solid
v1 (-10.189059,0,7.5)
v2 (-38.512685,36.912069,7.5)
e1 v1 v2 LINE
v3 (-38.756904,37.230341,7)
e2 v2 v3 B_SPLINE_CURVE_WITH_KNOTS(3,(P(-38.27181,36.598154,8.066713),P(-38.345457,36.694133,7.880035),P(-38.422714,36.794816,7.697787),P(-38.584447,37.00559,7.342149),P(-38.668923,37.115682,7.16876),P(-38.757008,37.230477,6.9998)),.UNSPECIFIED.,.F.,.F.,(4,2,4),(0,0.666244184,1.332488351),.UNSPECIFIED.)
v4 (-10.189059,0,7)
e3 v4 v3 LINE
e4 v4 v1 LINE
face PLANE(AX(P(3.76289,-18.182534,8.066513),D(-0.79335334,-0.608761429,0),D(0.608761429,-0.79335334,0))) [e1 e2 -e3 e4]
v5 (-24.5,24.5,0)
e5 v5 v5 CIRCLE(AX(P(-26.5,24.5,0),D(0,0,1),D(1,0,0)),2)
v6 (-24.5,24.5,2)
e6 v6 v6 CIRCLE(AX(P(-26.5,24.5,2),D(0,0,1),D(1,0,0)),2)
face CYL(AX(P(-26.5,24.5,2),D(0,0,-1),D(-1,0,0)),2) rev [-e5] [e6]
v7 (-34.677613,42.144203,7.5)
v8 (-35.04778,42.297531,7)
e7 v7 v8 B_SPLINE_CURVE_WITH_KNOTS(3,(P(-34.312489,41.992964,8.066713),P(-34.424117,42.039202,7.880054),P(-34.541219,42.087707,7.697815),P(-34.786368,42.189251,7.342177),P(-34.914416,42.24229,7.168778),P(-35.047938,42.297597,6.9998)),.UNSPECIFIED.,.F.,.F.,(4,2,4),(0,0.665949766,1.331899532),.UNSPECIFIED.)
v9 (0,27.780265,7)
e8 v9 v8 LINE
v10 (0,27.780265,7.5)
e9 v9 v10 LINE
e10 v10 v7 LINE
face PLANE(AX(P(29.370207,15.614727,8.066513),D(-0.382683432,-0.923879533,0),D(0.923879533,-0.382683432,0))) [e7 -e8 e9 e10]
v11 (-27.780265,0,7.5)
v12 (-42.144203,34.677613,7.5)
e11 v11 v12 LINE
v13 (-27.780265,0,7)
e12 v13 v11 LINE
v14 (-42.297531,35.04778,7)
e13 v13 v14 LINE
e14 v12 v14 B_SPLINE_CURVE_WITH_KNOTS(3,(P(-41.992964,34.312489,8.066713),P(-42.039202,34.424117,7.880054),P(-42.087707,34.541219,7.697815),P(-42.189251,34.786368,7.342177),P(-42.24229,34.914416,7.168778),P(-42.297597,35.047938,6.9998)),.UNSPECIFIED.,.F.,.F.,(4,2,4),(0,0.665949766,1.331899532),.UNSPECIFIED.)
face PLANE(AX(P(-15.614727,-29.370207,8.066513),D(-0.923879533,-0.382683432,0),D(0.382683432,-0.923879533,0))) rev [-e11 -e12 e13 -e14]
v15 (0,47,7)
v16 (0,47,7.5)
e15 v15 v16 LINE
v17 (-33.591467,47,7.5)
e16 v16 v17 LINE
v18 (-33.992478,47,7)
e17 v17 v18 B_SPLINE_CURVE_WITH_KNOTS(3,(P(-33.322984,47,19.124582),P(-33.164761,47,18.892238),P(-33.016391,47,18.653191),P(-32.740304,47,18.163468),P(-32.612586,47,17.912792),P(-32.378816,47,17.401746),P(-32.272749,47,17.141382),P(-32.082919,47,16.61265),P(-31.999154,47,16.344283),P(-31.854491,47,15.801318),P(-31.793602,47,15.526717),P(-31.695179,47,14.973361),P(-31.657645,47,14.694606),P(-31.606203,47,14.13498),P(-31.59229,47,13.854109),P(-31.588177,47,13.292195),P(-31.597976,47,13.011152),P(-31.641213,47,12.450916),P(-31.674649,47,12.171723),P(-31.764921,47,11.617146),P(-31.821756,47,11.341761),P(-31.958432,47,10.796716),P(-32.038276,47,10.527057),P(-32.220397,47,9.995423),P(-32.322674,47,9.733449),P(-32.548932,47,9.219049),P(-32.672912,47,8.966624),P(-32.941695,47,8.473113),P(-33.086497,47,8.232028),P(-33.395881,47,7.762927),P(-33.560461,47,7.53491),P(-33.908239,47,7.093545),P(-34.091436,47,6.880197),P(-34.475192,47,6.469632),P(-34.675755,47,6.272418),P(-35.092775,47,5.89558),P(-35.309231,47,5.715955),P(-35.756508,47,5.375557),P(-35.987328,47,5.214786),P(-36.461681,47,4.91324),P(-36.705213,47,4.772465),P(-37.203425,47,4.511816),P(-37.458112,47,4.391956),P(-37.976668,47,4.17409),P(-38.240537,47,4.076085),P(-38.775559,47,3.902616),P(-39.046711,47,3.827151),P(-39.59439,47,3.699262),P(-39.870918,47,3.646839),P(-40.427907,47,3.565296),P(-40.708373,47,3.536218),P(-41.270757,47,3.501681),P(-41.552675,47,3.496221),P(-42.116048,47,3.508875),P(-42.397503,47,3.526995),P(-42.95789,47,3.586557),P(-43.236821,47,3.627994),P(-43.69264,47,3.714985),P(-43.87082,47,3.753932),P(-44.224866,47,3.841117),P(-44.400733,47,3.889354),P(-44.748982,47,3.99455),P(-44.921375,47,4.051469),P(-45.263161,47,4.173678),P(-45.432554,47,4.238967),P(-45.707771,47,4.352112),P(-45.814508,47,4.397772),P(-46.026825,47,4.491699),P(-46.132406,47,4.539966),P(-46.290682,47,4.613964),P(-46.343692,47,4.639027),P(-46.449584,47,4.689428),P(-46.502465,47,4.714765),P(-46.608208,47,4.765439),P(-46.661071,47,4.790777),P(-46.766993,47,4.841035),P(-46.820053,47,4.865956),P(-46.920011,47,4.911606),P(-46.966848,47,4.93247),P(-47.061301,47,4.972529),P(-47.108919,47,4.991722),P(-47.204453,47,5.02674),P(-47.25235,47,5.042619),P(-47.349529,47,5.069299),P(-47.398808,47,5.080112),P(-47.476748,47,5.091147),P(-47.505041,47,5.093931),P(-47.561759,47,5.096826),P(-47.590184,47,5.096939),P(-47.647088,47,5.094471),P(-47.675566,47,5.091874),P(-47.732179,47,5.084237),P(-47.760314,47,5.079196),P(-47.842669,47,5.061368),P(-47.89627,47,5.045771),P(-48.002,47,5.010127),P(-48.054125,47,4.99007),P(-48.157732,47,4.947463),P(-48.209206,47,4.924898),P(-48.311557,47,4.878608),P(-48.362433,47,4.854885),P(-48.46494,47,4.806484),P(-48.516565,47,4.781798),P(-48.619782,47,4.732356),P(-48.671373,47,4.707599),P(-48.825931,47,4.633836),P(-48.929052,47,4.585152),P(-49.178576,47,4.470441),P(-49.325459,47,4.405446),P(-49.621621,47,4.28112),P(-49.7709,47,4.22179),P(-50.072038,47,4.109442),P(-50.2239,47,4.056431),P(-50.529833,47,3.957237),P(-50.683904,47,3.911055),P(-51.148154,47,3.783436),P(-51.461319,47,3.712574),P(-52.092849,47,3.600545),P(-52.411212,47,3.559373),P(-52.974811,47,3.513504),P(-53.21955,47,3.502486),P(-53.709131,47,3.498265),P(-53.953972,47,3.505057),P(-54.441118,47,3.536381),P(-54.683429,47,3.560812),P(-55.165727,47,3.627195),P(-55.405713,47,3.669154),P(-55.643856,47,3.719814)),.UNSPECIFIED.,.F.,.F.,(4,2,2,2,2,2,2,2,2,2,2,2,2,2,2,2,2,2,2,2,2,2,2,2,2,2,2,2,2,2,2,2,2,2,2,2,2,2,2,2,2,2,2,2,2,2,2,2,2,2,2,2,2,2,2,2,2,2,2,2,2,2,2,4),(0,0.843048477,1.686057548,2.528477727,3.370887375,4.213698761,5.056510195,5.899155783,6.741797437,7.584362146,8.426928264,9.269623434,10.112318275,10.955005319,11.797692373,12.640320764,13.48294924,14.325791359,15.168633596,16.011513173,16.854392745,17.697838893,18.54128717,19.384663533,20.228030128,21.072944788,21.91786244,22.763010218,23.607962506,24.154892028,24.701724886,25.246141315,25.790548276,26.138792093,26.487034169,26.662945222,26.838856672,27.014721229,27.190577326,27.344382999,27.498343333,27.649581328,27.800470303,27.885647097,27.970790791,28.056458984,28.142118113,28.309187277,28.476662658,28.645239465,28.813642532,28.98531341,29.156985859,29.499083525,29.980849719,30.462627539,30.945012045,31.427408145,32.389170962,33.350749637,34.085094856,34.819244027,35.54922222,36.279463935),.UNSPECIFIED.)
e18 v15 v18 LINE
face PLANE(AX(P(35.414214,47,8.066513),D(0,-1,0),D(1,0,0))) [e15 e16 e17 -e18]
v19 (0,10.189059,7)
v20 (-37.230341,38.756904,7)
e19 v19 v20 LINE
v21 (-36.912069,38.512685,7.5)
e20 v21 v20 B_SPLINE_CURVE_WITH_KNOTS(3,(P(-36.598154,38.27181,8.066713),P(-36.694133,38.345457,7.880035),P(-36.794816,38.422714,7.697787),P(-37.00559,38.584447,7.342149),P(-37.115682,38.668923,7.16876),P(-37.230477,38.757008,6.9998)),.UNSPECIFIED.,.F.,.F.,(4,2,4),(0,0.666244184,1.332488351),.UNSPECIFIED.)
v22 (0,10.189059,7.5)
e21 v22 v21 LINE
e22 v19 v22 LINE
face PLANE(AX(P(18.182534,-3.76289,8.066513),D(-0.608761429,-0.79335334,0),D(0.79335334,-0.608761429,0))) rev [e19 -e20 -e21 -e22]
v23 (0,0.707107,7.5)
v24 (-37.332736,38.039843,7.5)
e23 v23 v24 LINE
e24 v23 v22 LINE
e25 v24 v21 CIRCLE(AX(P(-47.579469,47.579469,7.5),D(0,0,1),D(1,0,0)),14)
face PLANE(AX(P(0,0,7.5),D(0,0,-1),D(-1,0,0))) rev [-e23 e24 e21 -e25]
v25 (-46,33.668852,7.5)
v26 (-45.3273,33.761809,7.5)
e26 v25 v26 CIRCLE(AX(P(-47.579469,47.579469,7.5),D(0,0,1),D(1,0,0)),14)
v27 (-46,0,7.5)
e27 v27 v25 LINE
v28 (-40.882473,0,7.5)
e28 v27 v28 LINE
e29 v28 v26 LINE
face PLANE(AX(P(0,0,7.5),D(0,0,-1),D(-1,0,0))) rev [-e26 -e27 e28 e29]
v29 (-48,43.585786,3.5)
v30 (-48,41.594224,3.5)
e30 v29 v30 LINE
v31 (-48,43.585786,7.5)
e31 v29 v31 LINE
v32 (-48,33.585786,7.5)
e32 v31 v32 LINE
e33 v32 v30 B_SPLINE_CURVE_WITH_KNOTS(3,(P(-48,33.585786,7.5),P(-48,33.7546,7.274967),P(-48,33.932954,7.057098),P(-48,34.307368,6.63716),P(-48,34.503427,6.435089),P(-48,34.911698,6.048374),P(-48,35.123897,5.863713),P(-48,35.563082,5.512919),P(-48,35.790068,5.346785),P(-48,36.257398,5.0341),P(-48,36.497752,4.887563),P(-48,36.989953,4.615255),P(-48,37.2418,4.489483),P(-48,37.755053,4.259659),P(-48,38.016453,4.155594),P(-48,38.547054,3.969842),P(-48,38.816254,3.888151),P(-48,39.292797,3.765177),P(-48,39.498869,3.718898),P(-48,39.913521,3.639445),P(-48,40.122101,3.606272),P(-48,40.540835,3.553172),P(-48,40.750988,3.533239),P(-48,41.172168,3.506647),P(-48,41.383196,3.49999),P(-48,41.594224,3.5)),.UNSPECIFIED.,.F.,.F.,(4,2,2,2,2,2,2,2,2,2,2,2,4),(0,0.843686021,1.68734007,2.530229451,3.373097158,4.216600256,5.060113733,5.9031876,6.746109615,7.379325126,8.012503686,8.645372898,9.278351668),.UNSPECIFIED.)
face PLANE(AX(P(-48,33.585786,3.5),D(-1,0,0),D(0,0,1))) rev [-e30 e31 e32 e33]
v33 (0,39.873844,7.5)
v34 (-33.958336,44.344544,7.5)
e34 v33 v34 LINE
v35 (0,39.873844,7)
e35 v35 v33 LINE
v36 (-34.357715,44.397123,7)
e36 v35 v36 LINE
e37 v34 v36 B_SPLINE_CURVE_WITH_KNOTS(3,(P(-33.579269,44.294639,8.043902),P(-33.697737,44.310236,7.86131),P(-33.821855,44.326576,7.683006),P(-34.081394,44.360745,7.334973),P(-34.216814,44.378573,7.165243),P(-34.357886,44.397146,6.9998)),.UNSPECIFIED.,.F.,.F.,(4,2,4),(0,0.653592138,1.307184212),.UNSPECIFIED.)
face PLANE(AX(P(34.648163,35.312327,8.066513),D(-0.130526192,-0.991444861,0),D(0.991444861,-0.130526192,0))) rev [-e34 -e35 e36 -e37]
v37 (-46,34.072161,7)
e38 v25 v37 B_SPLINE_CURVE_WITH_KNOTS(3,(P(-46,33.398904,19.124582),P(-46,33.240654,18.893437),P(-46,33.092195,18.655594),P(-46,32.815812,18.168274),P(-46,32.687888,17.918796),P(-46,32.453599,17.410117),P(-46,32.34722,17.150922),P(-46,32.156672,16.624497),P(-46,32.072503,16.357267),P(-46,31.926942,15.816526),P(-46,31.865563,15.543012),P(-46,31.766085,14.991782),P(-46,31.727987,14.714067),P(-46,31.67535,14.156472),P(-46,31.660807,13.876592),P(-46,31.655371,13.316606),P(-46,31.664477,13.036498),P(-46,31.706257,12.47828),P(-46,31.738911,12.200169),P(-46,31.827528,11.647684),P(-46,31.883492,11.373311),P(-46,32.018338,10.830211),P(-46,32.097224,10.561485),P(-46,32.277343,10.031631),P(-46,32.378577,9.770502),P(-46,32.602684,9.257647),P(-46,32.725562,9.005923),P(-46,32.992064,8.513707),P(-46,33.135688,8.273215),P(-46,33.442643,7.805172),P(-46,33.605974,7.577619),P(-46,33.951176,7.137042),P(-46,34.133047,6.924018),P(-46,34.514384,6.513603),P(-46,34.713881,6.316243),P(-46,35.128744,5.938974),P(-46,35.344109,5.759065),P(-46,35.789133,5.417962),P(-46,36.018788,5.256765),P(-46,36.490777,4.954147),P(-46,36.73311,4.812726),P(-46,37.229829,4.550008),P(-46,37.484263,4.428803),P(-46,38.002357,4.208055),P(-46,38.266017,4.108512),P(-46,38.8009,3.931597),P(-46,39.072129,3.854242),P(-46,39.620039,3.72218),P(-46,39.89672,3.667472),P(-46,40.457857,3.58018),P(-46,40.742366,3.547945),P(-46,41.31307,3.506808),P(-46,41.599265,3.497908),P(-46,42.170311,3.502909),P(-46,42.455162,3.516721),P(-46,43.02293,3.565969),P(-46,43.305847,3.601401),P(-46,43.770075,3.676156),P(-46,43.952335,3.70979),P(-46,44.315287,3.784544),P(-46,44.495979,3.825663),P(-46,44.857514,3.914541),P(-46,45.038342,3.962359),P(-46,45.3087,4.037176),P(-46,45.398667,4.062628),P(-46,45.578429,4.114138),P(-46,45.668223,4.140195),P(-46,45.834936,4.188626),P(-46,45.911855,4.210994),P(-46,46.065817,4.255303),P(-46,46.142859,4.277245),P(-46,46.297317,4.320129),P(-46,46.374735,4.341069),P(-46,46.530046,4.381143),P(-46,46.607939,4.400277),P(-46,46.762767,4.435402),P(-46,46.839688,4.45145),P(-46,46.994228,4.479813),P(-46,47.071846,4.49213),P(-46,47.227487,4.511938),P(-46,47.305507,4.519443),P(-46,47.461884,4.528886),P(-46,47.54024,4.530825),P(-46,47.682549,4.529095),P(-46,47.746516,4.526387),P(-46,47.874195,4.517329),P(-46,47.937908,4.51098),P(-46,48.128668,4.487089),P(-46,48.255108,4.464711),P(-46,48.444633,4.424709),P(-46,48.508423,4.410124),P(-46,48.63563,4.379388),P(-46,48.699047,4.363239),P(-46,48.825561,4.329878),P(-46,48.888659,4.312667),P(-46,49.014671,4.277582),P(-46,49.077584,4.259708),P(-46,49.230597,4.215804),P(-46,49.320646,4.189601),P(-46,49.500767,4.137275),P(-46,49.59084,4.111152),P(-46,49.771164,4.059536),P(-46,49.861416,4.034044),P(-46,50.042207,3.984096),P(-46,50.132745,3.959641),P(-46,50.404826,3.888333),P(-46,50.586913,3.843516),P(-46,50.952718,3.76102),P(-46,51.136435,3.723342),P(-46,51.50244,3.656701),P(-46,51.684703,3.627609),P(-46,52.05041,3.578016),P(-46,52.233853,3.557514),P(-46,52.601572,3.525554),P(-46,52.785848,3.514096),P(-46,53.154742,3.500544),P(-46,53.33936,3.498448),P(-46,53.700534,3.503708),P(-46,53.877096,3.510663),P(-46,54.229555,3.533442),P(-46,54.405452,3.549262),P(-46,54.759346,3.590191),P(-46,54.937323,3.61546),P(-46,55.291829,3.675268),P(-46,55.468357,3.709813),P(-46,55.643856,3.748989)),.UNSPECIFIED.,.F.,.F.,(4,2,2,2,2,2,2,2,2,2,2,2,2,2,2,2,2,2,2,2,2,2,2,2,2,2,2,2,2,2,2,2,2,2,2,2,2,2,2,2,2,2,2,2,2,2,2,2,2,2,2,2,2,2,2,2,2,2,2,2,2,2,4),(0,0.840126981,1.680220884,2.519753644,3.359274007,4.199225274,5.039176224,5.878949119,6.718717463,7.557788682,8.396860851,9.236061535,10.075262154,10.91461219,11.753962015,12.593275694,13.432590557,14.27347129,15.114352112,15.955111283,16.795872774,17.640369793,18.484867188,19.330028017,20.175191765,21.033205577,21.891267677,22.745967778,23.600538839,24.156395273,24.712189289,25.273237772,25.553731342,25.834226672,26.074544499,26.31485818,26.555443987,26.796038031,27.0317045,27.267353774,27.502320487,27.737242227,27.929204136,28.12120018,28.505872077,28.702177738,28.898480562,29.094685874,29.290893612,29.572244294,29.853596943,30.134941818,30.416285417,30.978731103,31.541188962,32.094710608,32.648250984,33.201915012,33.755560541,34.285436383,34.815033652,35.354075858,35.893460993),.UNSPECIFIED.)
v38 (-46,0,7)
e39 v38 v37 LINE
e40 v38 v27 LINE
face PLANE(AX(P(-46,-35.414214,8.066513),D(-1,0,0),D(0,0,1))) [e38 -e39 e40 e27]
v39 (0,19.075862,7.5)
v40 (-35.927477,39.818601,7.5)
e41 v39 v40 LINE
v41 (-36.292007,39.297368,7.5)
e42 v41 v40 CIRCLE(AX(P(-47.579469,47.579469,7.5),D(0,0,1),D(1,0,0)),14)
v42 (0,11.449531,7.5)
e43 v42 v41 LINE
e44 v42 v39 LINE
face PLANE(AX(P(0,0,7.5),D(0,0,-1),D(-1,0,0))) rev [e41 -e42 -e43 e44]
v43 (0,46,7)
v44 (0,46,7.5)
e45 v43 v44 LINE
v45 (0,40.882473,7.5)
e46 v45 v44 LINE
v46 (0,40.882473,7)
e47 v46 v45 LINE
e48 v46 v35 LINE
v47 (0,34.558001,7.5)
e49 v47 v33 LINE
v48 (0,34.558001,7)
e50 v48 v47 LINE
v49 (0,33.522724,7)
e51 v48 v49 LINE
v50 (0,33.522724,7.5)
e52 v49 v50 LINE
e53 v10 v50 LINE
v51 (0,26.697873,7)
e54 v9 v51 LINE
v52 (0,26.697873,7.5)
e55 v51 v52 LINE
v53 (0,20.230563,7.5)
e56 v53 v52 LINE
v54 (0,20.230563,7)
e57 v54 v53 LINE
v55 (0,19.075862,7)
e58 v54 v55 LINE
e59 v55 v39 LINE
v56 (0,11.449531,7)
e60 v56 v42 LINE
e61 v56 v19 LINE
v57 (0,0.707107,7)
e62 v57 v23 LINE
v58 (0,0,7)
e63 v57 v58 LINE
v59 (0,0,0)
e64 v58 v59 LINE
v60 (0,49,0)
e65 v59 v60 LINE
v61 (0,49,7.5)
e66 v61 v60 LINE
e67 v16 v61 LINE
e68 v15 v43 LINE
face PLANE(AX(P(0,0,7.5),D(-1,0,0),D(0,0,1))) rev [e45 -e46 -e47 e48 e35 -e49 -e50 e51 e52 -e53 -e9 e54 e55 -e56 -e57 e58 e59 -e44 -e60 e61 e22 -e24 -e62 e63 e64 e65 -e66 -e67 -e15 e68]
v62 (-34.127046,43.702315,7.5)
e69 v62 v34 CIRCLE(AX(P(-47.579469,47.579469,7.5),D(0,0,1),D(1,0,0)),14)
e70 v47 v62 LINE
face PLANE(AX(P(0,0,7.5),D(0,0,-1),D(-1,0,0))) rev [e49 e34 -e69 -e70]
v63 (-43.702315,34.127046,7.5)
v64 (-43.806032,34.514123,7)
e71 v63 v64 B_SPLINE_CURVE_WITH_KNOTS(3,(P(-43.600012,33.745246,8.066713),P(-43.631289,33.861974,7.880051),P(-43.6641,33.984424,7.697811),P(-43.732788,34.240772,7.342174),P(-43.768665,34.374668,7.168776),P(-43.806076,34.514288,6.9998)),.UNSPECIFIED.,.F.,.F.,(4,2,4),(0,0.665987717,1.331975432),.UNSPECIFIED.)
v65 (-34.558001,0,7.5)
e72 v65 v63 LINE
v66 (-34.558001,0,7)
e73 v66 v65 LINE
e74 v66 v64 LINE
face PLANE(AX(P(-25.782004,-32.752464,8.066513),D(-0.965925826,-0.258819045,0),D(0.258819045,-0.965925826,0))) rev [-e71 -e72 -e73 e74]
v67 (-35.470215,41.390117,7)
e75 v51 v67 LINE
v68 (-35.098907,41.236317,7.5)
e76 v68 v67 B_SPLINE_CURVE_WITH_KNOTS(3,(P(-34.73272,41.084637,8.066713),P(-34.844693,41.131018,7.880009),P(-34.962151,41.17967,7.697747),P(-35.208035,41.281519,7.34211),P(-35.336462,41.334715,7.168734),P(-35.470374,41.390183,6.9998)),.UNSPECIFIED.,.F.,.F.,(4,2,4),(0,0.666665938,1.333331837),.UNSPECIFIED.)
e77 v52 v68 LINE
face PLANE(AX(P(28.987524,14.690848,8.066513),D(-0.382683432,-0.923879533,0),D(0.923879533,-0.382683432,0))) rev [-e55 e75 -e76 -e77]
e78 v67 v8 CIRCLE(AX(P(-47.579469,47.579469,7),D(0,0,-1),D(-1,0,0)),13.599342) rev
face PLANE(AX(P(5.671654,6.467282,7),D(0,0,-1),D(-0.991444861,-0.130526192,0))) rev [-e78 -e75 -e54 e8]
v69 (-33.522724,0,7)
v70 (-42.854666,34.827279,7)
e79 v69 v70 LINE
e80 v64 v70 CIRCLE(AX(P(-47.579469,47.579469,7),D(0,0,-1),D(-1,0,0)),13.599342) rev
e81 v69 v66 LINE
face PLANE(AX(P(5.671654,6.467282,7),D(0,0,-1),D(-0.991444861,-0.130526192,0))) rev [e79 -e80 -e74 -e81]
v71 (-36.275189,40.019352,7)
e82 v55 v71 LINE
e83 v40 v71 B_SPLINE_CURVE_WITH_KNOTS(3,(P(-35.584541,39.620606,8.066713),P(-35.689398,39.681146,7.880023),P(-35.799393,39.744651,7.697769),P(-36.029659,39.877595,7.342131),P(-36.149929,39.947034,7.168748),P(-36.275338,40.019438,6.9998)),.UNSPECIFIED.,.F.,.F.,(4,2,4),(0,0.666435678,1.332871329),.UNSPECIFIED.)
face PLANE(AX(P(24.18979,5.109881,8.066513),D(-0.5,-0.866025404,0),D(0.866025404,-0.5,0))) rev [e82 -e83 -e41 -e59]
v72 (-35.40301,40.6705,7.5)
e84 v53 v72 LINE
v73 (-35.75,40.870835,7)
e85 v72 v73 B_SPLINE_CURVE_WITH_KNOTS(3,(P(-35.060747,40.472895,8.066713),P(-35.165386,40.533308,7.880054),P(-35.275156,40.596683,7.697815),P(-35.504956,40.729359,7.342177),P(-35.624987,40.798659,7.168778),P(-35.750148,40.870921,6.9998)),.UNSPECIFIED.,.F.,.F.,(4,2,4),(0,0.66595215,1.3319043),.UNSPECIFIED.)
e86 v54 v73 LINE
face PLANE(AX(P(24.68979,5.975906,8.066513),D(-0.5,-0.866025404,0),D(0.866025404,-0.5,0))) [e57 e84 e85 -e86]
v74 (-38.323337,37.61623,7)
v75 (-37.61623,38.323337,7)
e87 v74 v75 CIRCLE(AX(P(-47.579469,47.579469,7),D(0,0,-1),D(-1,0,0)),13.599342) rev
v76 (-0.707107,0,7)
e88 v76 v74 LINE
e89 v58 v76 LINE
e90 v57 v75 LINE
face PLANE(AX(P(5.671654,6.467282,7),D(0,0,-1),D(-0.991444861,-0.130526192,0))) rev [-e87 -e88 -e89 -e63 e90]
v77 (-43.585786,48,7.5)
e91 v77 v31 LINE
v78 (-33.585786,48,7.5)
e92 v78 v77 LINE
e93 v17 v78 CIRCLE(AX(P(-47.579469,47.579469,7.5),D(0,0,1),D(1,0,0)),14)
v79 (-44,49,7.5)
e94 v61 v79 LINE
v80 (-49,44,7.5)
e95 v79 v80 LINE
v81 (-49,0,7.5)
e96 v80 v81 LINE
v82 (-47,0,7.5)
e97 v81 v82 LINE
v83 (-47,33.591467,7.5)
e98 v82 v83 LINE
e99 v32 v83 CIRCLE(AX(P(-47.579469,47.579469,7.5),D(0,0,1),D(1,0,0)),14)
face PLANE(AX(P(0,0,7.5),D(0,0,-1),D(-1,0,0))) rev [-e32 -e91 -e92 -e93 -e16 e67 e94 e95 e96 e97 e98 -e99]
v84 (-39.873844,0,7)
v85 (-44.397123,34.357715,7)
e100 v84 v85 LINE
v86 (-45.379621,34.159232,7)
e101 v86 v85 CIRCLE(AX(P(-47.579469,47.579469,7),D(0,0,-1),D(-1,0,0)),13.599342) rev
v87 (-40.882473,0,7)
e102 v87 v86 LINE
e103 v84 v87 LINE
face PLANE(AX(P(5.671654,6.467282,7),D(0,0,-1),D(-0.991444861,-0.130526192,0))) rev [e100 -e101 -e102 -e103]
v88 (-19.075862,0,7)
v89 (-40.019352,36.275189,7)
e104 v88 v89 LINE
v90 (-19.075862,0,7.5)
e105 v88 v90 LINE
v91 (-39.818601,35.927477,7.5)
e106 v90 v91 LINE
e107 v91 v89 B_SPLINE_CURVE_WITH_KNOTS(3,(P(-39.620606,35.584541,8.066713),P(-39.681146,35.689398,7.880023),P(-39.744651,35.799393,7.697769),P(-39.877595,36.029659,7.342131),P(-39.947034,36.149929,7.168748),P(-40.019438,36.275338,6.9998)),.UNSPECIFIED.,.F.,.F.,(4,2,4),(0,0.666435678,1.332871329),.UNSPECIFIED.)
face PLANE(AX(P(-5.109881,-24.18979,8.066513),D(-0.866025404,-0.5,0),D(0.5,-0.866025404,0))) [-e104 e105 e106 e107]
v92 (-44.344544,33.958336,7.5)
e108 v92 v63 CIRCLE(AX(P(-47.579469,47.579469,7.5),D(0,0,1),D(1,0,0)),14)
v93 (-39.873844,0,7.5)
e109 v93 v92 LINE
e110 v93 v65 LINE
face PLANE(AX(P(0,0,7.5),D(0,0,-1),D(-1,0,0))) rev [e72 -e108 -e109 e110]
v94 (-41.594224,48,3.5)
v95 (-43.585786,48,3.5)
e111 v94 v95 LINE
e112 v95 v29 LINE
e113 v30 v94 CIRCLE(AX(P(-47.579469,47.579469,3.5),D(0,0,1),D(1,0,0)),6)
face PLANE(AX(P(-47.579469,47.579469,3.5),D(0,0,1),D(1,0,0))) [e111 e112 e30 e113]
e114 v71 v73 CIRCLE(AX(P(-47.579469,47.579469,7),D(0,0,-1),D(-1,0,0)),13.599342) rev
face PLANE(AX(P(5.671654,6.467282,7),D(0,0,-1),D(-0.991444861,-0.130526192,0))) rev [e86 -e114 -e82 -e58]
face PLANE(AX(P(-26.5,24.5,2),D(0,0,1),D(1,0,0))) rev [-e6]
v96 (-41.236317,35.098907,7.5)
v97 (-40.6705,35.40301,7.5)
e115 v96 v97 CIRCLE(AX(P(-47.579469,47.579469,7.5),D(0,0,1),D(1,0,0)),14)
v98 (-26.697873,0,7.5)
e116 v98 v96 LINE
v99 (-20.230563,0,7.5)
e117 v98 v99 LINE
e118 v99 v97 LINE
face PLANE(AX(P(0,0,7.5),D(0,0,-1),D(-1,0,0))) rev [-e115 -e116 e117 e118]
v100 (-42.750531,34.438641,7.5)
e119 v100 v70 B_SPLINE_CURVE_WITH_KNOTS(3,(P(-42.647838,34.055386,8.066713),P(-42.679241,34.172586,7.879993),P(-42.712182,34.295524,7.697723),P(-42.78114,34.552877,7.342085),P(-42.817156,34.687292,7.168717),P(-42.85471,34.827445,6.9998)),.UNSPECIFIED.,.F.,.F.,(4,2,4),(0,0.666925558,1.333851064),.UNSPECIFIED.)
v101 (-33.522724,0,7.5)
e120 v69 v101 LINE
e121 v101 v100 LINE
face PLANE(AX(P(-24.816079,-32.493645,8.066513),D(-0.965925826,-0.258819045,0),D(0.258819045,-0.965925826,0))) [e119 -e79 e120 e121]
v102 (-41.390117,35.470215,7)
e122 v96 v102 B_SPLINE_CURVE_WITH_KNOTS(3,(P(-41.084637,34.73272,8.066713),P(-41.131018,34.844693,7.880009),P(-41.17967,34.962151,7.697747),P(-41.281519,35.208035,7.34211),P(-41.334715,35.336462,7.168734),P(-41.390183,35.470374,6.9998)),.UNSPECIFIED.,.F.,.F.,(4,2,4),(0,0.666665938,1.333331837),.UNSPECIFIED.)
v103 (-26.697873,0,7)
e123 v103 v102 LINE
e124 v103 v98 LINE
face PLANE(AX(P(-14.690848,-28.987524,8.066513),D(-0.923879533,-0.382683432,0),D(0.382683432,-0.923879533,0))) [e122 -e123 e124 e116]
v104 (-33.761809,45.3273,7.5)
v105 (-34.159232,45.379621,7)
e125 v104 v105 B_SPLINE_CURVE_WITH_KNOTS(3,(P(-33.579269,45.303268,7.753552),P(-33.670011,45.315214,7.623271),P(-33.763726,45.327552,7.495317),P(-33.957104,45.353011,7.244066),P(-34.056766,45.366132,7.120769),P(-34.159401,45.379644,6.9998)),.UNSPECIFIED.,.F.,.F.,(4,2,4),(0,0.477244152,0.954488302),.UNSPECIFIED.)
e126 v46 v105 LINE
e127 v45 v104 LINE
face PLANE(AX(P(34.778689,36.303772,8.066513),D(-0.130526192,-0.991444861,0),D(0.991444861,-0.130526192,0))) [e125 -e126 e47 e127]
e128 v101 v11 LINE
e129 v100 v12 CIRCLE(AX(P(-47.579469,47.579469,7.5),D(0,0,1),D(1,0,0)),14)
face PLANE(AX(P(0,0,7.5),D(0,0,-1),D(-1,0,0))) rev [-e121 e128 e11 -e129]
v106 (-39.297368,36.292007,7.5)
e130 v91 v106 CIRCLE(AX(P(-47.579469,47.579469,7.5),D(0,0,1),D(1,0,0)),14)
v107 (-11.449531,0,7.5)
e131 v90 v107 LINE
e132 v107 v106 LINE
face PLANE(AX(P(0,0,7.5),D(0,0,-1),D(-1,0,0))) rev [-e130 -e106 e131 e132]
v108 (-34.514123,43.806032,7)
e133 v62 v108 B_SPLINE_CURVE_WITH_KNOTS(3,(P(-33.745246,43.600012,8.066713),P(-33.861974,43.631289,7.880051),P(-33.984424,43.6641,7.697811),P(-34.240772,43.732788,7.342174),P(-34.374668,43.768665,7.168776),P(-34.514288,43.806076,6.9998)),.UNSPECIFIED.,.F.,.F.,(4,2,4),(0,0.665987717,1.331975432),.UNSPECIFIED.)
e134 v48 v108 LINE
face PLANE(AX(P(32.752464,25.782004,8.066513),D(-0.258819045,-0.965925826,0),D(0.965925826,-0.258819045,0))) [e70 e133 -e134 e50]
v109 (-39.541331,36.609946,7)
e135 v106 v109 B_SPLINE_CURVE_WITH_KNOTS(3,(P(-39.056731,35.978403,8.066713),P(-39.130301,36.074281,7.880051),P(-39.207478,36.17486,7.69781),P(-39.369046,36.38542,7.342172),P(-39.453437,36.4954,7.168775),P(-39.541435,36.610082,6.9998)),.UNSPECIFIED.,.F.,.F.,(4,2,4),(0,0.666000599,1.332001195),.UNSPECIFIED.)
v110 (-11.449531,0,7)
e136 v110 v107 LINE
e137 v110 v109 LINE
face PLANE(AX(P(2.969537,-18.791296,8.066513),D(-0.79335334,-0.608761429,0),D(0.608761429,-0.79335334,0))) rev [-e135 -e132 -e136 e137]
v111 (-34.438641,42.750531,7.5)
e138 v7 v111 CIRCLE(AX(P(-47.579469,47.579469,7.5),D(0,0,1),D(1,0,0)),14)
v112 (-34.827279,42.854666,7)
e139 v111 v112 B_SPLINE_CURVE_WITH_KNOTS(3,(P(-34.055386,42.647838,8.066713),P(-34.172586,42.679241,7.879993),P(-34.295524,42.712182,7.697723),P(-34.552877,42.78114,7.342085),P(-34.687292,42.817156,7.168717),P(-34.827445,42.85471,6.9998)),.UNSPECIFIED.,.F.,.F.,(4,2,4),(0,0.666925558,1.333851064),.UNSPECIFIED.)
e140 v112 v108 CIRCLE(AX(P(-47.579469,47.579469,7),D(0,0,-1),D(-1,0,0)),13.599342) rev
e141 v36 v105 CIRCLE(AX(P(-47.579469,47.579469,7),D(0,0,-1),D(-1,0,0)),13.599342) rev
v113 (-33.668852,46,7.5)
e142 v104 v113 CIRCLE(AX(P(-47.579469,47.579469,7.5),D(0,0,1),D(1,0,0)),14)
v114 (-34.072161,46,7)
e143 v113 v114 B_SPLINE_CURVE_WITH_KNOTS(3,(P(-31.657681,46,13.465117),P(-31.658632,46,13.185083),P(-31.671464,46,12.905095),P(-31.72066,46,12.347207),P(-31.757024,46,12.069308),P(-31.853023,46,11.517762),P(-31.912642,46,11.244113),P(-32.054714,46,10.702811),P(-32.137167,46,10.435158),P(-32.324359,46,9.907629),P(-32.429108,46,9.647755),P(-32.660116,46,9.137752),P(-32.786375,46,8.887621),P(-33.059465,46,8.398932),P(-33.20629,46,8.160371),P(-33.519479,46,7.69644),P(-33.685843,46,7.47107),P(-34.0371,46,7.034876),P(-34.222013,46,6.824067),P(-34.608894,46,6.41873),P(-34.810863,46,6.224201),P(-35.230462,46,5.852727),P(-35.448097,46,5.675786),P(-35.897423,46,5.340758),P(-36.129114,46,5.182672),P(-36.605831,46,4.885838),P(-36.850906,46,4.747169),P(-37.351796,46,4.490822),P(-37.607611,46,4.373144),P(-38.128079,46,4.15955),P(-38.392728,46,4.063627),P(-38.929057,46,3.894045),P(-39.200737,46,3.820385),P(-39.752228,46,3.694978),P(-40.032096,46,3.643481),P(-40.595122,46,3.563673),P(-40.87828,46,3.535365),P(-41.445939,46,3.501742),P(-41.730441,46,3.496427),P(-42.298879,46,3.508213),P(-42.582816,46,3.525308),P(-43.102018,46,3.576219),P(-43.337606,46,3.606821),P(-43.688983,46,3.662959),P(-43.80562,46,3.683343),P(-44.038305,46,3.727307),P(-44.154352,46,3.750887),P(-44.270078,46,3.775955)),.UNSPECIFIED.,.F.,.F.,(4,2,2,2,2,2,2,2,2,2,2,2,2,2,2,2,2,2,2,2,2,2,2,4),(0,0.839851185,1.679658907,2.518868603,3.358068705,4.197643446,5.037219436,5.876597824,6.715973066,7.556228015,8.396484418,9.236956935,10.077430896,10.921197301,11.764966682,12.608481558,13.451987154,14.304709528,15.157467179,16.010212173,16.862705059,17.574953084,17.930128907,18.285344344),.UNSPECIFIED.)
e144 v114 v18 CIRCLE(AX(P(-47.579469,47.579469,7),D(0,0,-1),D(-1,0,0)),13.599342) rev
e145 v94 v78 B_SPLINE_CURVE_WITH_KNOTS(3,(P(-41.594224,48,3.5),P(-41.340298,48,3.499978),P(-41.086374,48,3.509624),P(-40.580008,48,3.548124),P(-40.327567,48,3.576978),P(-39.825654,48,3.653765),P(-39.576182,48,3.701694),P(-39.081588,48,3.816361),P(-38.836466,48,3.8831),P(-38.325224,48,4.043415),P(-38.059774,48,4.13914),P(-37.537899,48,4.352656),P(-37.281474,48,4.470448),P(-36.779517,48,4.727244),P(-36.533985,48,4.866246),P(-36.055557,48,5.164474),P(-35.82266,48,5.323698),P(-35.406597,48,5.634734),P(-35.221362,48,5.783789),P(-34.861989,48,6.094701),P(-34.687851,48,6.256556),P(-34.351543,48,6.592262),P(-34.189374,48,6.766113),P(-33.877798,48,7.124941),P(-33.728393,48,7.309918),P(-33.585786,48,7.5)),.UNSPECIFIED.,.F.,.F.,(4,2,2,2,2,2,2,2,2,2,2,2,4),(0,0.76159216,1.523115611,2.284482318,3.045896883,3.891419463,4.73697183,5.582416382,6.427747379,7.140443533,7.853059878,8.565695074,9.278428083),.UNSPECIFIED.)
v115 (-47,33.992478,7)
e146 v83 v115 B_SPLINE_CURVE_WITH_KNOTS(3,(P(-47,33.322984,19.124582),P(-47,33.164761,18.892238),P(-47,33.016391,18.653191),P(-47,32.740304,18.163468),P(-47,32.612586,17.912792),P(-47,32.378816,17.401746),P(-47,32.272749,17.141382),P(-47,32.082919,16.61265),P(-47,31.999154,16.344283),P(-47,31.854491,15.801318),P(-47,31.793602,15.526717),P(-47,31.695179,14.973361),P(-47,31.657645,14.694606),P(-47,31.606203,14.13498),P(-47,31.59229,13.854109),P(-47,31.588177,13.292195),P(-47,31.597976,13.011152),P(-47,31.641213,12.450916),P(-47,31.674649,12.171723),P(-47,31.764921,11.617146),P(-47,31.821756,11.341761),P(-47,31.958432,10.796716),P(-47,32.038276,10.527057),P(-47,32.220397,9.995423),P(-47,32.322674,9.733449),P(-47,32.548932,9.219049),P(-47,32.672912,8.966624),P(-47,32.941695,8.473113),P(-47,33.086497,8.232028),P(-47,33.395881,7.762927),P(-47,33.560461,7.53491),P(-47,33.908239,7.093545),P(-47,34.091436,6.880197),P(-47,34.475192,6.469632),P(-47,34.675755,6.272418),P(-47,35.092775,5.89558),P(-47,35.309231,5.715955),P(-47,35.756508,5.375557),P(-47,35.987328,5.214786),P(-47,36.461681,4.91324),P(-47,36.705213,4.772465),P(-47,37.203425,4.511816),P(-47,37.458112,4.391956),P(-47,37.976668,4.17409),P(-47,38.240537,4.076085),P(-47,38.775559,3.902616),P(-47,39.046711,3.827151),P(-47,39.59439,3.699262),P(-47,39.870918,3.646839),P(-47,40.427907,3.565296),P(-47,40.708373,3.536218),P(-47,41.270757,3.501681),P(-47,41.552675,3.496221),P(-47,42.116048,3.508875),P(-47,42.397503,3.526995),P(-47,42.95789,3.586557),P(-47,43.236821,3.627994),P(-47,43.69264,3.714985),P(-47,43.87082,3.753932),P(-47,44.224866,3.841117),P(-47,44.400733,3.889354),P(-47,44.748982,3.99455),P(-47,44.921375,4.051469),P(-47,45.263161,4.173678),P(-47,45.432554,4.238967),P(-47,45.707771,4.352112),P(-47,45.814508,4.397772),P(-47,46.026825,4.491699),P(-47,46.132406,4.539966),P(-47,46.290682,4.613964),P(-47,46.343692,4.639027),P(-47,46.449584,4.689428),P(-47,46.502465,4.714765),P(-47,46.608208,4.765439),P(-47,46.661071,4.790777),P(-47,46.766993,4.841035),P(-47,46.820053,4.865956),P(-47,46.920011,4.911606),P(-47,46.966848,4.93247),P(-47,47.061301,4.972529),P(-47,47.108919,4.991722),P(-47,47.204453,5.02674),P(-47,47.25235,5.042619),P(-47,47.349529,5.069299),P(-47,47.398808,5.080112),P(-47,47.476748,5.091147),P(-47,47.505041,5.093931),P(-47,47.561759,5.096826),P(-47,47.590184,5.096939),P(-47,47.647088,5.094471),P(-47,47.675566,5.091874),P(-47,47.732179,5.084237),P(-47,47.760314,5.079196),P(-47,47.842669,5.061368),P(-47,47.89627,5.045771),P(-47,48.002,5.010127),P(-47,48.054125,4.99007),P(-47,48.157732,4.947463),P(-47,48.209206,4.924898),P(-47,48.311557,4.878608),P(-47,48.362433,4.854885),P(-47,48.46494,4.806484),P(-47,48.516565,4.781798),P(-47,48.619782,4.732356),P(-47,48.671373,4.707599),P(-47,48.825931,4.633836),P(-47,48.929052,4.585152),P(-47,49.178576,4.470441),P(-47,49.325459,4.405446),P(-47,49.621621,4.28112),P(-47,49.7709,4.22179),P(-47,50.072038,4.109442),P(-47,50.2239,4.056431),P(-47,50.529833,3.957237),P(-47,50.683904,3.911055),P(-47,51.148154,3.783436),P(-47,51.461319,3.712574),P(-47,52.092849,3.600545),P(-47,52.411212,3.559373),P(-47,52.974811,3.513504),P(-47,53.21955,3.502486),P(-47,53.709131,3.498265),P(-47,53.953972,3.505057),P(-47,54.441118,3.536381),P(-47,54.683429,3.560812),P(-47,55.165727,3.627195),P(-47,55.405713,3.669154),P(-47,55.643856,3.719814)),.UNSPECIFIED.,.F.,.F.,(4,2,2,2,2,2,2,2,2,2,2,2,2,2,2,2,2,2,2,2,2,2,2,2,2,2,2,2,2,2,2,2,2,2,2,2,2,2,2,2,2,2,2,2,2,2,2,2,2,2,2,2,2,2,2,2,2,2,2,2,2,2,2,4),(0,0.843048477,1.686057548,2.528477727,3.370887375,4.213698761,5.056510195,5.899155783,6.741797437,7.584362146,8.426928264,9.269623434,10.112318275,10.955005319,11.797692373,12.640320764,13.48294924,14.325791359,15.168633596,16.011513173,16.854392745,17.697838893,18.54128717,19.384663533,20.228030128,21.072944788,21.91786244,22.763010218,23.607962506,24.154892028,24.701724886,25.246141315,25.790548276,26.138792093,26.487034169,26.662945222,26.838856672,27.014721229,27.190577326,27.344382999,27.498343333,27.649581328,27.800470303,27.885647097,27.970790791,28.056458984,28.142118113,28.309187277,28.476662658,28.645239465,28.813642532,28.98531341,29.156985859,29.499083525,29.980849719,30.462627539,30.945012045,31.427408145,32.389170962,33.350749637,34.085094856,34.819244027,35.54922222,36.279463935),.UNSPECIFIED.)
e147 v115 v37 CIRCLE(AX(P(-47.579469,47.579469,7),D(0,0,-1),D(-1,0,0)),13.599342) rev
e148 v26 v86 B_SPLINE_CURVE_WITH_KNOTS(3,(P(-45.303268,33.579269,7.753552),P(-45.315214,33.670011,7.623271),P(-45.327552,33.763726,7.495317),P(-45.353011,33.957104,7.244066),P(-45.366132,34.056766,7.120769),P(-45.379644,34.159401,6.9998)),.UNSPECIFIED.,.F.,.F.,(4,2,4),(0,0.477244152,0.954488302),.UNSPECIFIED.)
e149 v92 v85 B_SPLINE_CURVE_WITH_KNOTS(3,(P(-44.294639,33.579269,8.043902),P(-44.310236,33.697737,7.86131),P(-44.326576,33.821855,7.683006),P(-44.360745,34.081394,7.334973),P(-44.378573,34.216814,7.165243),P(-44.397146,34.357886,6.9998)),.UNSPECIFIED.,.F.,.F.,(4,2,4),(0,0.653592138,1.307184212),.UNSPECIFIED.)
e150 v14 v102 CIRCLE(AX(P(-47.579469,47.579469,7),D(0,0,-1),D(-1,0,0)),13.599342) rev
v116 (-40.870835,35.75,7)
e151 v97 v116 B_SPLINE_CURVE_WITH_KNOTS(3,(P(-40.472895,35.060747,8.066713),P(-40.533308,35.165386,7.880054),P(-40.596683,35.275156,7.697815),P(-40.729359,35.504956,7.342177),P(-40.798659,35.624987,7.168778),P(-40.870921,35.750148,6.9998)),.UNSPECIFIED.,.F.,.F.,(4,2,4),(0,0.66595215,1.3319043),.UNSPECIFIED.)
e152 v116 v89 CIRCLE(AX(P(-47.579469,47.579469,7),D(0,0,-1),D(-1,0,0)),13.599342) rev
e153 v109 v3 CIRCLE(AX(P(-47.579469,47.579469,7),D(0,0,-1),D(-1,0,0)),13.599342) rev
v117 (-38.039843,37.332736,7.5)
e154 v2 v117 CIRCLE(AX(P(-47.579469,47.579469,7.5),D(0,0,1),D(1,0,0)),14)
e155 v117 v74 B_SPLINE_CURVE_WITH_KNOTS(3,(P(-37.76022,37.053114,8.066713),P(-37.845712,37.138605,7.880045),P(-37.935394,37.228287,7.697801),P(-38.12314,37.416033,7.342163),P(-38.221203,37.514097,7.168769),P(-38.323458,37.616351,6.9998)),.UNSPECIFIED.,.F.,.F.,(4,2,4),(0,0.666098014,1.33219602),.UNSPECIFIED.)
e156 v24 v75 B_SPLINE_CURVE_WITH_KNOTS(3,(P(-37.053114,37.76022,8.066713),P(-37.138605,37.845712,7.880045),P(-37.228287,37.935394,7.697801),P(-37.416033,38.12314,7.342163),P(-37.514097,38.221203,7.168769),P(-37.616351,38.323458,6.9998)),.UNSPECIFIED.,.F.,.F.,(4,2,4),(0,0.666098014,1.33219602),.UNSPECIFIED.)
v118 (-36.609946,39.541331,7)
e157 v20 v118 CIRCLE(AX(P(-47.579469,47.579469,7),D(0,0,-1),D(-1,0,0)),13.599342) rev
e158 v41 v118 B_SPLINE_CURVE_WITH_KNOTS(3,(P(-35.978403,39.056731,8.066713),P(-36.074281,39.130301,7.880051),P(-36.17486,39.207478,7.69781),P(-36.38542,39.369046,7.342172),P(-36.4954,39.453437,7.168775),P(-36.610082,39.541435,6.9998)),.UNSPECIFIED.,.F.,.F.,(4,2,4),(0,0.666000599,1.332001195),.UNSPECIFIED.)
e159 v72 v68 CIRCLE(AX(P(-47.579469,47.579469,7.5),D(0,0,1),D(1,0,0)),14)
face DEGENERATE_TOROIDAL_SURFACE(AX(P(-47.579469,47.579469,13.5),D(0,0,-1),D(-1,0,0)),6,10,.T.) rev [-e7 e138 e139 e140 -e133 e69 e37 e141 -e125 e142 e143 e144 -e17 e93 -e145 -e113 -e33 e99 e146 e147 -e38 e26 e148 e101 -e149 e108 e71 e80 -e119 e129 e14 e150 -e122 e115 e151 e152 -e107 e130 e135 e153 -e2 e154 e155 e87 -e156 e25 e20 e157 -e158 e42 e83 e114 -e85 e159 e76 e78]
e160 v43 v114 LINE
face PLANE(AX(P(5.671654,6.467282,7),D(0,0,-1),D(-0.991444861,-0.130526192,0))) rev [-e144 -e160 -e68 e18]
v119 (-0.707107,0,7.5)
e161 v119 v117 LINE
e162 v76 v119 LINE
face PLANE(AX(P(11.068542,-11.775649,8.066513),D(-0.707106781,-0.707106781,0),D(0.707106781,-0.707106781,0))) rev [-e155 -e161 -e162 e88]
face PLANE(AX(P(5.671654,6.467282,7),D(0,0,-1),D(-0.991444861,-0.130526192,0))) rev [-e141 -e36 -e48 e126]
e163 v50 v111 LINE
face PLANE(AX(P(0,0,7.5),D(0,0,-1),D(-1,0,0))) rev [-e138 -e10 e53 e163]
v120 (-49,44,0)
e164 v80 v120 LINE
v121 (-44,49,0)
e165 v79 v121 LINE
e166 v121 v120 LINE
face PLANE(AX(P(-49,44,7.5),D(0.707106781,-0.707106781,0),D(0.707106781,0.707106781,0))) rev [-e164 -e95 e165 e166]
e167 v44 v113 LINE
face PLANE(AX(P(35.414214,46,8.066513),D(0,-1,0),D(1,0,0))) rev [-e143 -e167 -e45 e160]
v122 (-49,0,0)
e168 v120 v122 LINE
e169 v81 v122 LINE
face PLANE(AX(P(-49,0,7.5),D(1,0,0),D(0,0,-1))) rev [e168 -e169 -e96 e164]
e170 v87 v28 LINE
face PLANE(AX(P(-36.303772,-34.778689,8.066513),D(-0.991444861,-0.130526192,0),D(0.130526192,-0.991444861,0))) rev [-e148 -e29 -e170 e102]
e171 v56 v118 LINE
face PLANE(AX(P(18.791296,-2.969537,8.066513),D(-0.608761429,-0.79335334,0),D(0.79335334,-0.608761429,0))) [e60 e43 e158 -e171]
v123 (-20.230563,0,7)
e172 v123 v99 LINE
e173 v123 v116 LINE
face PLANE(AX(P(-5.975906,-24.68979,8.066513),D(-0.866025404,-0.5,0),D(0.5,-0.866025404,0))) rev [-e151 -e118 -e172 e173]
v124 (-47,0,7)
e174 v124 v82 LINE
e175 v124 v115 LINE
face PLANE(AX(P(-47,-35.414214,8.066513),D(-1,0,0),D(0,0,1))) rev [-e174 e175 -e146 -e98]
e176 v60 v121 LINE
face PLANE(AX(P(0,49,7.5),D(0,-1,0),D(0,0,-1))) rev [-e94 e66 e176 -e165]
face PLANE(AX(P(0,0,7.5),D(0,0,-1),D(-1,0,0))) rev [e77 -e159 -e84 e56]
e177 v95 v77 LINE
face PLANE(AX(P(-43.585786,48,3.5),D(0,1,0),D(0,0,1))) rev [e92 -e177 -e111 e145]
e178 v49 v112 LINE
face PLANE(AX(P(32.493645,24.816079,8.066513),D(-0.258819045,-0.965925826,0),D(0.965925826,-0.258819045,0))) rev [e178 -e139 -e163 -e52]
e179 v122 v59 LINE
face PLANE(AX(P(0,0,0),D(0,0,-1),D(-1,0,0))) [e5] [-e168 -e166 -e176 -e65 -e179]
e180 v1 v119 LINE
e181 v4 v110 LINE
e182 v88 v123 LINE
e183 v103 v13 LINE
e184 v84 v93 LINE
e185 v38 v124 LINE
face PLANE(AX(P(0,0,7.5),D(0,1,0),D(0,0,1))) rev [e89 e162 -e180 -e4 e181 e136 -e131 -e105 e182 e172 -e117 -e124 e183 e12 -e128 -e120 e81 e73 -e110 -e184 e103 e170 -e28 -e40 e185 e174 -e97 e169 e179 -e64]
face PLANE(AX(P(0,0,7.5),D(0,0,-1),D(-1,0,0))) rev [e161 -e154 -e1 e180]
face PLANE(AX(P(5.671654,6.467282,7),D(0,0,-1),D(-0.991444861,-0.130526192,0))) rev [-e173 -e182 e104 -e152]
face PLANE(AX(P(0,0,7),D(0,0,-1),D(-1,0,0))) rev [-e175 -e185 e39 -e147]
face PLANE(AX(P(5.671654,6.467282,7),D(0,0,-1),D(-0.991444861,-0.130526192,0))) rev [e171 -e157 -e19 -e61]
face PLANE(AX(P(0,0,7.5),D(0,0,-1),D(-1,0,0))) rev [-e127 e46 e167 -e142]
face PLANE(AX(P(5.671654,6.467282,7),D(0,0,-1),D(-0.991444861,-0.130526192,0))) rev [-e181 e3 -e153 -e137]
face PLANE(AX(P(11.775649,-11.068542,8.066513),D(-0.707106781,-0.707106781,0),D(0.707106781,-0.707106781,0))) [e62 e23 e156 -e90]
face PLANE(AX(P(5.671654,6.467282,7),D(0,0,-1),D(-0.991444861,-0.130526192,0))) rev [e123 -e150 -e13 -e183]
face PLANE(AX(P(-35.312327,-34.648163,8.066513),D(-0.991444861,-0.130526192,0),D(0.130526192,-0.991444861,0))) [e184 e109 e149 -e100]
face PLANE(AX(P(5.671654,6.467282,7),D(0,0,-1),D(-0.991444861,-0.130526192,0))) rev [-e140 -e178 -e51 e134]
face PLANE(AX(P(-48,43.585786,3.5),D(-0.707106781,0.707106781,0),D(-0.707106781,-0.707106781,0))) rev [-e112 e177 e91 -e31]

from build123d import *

# Parameters (mm, degrees)
BOSS_EXTRUDE1_DEPTH     = 7.5
CUT_EXTRUDE1_DEPTH      = 4
FILLET1_R               = 10
CUT_EXTRUDE_THIN2_START = -0.5
SKETCH2_W               = 1
SKETCH2_H               = 80
CUT_EXTRUDE_THIN2_DEPTH = 71.201147767
CIRPATTERN1_COUNT       = 13
CIRPATTERN1_ANGLE       = 90
SKETCH5_R               = 2
CUT_EXTRUDE2_DEPTH      = 2


with BuildPart() as part:
    # Sketch1 → Boss-Extrude1 (new body)
    with BuildSketch(Plane(origin=(0, 0, 0), x_dir=(0, 1, 0), z_dir=(0, 0, 1))):
        Polygon((44, 49), (49, 44), (49, 0), (0, 0), (0, 49), align=None)
    extrude(amount=BOSS_EXTRUDE1_DEPTH)

    # Sketch4 → Cut-Extrude1 (cut)
    with BuildSketch(Plane.XY.offset(7.5)):
        with BuildLine():
            Line((-48, 33.585786438), (-48, 43.585786438))
            Line((-48, 43.585786438), (-43.585786438, 48))
            Line((-43.585786438, 48), (-33.585786438, 48))
            ThreePointArc((-33.585786438, 48), (-37.679974138, 37.679974138), (-48, 33.585786438))
        make_face()
    extrude(amount=-CUT_EXTRUDE1_DEPTH, mode=Mode.SUBTRACT)

    # Fillet1
    # the kernel refuses this fillet: 10 mm, written as the material it adds along each edge
    with BuildSketch(Plane(origin=(-47.579469074, 47.579469074, 3.5), x_dir=(0.11133254598892352, 0.9937832078494908, 0), z_dir=(-0.9937832078494908, 0.11133254598892352, 0))) as fillet1_piece_1_section:
        with BuildLine():
            CenterArc((6, -10), FILLET1_R, 36.869897646, 53.130102354)
            Line((6, 0), (6, 0.2))
            Line((6, 0.2), (14, 0.2))
            Line((14, 0.2), (14.2, 0))
            ThreePointArc((14.2, 0), (14.2, -2), (14.16, -3.88))
            Line((14.16, -3.88), (14, -4))
        make_face()
    fillet1_piece_1 = revolve(axis=Axis((-47.579469074, 47.579469074, 3.5), (0, 0, -1)), revolution_arc=257.215726598, mode=Mode.PRIVATE)
    fillet1_piece_1 = split(fillet1_piece_1, bisect_by=Plane(origin=(-48, 39.87908293, 4.608055209), z_dir=(1, 0, 0)), keep=Keep.TOP, mode=Mode.PRIVATE)
    fillet1_piece_1 = split(fillet1_piece_1, bisect_by=Plane(origin=(-39.879083288, 48, 4.608055209), z_dir=(0, -1, 0)), keep=Keep.TOP, mode=Mode.PRIVATE)
    add(fillet1_piece_1)

    # Sketch2 → Cut-Extrude-Thin2 (cut)
    with BuildSketch(Plane.XY.offset(7.5).offset(CUT_EXTRUDE_THIN2_START)):
        with Locations((-46.5, 4.585786438)):
            Rectangle(SKETCH2_W, SKETCH2_H)
    cut_extrude_thin2 = extrude(amount=CUT_EXTRUDE_THIN2_DEPTH, mode=Mode.SUBTRACT)

    # CirPattern1: Cut-Extrude-Thin2 ×13 about axis
    cirpattern1_axis = Axis((-46.5, 46.5, 0), (0, 0, 1))
    for i in range(1, CIRPATTERN1_COUNT):
        add(cut_extrude_thin2.rotate(cirpattern1_axis, i * CIRPATTERN1_ANGLE / (CIRPATTERN1_COUNT - 1)), mode=Mode.SUBTRACT)

    # Sketch5 → Cut-Extrude2 (cut)
    with BuildSketch(Plane(origin=(0, 0, 0), x_dir=(0, 1, 0), z_dir=(0, 0, 1))):
        with Locations(Location((24.5, 26.5, 0), (0, 0, 270))):
            Circle(SKETCH5_R)
    extrude(amount=CUT_EXTRUDE2_DEPTH, mode=Mode.SUBTRACT)


solid = part.part
